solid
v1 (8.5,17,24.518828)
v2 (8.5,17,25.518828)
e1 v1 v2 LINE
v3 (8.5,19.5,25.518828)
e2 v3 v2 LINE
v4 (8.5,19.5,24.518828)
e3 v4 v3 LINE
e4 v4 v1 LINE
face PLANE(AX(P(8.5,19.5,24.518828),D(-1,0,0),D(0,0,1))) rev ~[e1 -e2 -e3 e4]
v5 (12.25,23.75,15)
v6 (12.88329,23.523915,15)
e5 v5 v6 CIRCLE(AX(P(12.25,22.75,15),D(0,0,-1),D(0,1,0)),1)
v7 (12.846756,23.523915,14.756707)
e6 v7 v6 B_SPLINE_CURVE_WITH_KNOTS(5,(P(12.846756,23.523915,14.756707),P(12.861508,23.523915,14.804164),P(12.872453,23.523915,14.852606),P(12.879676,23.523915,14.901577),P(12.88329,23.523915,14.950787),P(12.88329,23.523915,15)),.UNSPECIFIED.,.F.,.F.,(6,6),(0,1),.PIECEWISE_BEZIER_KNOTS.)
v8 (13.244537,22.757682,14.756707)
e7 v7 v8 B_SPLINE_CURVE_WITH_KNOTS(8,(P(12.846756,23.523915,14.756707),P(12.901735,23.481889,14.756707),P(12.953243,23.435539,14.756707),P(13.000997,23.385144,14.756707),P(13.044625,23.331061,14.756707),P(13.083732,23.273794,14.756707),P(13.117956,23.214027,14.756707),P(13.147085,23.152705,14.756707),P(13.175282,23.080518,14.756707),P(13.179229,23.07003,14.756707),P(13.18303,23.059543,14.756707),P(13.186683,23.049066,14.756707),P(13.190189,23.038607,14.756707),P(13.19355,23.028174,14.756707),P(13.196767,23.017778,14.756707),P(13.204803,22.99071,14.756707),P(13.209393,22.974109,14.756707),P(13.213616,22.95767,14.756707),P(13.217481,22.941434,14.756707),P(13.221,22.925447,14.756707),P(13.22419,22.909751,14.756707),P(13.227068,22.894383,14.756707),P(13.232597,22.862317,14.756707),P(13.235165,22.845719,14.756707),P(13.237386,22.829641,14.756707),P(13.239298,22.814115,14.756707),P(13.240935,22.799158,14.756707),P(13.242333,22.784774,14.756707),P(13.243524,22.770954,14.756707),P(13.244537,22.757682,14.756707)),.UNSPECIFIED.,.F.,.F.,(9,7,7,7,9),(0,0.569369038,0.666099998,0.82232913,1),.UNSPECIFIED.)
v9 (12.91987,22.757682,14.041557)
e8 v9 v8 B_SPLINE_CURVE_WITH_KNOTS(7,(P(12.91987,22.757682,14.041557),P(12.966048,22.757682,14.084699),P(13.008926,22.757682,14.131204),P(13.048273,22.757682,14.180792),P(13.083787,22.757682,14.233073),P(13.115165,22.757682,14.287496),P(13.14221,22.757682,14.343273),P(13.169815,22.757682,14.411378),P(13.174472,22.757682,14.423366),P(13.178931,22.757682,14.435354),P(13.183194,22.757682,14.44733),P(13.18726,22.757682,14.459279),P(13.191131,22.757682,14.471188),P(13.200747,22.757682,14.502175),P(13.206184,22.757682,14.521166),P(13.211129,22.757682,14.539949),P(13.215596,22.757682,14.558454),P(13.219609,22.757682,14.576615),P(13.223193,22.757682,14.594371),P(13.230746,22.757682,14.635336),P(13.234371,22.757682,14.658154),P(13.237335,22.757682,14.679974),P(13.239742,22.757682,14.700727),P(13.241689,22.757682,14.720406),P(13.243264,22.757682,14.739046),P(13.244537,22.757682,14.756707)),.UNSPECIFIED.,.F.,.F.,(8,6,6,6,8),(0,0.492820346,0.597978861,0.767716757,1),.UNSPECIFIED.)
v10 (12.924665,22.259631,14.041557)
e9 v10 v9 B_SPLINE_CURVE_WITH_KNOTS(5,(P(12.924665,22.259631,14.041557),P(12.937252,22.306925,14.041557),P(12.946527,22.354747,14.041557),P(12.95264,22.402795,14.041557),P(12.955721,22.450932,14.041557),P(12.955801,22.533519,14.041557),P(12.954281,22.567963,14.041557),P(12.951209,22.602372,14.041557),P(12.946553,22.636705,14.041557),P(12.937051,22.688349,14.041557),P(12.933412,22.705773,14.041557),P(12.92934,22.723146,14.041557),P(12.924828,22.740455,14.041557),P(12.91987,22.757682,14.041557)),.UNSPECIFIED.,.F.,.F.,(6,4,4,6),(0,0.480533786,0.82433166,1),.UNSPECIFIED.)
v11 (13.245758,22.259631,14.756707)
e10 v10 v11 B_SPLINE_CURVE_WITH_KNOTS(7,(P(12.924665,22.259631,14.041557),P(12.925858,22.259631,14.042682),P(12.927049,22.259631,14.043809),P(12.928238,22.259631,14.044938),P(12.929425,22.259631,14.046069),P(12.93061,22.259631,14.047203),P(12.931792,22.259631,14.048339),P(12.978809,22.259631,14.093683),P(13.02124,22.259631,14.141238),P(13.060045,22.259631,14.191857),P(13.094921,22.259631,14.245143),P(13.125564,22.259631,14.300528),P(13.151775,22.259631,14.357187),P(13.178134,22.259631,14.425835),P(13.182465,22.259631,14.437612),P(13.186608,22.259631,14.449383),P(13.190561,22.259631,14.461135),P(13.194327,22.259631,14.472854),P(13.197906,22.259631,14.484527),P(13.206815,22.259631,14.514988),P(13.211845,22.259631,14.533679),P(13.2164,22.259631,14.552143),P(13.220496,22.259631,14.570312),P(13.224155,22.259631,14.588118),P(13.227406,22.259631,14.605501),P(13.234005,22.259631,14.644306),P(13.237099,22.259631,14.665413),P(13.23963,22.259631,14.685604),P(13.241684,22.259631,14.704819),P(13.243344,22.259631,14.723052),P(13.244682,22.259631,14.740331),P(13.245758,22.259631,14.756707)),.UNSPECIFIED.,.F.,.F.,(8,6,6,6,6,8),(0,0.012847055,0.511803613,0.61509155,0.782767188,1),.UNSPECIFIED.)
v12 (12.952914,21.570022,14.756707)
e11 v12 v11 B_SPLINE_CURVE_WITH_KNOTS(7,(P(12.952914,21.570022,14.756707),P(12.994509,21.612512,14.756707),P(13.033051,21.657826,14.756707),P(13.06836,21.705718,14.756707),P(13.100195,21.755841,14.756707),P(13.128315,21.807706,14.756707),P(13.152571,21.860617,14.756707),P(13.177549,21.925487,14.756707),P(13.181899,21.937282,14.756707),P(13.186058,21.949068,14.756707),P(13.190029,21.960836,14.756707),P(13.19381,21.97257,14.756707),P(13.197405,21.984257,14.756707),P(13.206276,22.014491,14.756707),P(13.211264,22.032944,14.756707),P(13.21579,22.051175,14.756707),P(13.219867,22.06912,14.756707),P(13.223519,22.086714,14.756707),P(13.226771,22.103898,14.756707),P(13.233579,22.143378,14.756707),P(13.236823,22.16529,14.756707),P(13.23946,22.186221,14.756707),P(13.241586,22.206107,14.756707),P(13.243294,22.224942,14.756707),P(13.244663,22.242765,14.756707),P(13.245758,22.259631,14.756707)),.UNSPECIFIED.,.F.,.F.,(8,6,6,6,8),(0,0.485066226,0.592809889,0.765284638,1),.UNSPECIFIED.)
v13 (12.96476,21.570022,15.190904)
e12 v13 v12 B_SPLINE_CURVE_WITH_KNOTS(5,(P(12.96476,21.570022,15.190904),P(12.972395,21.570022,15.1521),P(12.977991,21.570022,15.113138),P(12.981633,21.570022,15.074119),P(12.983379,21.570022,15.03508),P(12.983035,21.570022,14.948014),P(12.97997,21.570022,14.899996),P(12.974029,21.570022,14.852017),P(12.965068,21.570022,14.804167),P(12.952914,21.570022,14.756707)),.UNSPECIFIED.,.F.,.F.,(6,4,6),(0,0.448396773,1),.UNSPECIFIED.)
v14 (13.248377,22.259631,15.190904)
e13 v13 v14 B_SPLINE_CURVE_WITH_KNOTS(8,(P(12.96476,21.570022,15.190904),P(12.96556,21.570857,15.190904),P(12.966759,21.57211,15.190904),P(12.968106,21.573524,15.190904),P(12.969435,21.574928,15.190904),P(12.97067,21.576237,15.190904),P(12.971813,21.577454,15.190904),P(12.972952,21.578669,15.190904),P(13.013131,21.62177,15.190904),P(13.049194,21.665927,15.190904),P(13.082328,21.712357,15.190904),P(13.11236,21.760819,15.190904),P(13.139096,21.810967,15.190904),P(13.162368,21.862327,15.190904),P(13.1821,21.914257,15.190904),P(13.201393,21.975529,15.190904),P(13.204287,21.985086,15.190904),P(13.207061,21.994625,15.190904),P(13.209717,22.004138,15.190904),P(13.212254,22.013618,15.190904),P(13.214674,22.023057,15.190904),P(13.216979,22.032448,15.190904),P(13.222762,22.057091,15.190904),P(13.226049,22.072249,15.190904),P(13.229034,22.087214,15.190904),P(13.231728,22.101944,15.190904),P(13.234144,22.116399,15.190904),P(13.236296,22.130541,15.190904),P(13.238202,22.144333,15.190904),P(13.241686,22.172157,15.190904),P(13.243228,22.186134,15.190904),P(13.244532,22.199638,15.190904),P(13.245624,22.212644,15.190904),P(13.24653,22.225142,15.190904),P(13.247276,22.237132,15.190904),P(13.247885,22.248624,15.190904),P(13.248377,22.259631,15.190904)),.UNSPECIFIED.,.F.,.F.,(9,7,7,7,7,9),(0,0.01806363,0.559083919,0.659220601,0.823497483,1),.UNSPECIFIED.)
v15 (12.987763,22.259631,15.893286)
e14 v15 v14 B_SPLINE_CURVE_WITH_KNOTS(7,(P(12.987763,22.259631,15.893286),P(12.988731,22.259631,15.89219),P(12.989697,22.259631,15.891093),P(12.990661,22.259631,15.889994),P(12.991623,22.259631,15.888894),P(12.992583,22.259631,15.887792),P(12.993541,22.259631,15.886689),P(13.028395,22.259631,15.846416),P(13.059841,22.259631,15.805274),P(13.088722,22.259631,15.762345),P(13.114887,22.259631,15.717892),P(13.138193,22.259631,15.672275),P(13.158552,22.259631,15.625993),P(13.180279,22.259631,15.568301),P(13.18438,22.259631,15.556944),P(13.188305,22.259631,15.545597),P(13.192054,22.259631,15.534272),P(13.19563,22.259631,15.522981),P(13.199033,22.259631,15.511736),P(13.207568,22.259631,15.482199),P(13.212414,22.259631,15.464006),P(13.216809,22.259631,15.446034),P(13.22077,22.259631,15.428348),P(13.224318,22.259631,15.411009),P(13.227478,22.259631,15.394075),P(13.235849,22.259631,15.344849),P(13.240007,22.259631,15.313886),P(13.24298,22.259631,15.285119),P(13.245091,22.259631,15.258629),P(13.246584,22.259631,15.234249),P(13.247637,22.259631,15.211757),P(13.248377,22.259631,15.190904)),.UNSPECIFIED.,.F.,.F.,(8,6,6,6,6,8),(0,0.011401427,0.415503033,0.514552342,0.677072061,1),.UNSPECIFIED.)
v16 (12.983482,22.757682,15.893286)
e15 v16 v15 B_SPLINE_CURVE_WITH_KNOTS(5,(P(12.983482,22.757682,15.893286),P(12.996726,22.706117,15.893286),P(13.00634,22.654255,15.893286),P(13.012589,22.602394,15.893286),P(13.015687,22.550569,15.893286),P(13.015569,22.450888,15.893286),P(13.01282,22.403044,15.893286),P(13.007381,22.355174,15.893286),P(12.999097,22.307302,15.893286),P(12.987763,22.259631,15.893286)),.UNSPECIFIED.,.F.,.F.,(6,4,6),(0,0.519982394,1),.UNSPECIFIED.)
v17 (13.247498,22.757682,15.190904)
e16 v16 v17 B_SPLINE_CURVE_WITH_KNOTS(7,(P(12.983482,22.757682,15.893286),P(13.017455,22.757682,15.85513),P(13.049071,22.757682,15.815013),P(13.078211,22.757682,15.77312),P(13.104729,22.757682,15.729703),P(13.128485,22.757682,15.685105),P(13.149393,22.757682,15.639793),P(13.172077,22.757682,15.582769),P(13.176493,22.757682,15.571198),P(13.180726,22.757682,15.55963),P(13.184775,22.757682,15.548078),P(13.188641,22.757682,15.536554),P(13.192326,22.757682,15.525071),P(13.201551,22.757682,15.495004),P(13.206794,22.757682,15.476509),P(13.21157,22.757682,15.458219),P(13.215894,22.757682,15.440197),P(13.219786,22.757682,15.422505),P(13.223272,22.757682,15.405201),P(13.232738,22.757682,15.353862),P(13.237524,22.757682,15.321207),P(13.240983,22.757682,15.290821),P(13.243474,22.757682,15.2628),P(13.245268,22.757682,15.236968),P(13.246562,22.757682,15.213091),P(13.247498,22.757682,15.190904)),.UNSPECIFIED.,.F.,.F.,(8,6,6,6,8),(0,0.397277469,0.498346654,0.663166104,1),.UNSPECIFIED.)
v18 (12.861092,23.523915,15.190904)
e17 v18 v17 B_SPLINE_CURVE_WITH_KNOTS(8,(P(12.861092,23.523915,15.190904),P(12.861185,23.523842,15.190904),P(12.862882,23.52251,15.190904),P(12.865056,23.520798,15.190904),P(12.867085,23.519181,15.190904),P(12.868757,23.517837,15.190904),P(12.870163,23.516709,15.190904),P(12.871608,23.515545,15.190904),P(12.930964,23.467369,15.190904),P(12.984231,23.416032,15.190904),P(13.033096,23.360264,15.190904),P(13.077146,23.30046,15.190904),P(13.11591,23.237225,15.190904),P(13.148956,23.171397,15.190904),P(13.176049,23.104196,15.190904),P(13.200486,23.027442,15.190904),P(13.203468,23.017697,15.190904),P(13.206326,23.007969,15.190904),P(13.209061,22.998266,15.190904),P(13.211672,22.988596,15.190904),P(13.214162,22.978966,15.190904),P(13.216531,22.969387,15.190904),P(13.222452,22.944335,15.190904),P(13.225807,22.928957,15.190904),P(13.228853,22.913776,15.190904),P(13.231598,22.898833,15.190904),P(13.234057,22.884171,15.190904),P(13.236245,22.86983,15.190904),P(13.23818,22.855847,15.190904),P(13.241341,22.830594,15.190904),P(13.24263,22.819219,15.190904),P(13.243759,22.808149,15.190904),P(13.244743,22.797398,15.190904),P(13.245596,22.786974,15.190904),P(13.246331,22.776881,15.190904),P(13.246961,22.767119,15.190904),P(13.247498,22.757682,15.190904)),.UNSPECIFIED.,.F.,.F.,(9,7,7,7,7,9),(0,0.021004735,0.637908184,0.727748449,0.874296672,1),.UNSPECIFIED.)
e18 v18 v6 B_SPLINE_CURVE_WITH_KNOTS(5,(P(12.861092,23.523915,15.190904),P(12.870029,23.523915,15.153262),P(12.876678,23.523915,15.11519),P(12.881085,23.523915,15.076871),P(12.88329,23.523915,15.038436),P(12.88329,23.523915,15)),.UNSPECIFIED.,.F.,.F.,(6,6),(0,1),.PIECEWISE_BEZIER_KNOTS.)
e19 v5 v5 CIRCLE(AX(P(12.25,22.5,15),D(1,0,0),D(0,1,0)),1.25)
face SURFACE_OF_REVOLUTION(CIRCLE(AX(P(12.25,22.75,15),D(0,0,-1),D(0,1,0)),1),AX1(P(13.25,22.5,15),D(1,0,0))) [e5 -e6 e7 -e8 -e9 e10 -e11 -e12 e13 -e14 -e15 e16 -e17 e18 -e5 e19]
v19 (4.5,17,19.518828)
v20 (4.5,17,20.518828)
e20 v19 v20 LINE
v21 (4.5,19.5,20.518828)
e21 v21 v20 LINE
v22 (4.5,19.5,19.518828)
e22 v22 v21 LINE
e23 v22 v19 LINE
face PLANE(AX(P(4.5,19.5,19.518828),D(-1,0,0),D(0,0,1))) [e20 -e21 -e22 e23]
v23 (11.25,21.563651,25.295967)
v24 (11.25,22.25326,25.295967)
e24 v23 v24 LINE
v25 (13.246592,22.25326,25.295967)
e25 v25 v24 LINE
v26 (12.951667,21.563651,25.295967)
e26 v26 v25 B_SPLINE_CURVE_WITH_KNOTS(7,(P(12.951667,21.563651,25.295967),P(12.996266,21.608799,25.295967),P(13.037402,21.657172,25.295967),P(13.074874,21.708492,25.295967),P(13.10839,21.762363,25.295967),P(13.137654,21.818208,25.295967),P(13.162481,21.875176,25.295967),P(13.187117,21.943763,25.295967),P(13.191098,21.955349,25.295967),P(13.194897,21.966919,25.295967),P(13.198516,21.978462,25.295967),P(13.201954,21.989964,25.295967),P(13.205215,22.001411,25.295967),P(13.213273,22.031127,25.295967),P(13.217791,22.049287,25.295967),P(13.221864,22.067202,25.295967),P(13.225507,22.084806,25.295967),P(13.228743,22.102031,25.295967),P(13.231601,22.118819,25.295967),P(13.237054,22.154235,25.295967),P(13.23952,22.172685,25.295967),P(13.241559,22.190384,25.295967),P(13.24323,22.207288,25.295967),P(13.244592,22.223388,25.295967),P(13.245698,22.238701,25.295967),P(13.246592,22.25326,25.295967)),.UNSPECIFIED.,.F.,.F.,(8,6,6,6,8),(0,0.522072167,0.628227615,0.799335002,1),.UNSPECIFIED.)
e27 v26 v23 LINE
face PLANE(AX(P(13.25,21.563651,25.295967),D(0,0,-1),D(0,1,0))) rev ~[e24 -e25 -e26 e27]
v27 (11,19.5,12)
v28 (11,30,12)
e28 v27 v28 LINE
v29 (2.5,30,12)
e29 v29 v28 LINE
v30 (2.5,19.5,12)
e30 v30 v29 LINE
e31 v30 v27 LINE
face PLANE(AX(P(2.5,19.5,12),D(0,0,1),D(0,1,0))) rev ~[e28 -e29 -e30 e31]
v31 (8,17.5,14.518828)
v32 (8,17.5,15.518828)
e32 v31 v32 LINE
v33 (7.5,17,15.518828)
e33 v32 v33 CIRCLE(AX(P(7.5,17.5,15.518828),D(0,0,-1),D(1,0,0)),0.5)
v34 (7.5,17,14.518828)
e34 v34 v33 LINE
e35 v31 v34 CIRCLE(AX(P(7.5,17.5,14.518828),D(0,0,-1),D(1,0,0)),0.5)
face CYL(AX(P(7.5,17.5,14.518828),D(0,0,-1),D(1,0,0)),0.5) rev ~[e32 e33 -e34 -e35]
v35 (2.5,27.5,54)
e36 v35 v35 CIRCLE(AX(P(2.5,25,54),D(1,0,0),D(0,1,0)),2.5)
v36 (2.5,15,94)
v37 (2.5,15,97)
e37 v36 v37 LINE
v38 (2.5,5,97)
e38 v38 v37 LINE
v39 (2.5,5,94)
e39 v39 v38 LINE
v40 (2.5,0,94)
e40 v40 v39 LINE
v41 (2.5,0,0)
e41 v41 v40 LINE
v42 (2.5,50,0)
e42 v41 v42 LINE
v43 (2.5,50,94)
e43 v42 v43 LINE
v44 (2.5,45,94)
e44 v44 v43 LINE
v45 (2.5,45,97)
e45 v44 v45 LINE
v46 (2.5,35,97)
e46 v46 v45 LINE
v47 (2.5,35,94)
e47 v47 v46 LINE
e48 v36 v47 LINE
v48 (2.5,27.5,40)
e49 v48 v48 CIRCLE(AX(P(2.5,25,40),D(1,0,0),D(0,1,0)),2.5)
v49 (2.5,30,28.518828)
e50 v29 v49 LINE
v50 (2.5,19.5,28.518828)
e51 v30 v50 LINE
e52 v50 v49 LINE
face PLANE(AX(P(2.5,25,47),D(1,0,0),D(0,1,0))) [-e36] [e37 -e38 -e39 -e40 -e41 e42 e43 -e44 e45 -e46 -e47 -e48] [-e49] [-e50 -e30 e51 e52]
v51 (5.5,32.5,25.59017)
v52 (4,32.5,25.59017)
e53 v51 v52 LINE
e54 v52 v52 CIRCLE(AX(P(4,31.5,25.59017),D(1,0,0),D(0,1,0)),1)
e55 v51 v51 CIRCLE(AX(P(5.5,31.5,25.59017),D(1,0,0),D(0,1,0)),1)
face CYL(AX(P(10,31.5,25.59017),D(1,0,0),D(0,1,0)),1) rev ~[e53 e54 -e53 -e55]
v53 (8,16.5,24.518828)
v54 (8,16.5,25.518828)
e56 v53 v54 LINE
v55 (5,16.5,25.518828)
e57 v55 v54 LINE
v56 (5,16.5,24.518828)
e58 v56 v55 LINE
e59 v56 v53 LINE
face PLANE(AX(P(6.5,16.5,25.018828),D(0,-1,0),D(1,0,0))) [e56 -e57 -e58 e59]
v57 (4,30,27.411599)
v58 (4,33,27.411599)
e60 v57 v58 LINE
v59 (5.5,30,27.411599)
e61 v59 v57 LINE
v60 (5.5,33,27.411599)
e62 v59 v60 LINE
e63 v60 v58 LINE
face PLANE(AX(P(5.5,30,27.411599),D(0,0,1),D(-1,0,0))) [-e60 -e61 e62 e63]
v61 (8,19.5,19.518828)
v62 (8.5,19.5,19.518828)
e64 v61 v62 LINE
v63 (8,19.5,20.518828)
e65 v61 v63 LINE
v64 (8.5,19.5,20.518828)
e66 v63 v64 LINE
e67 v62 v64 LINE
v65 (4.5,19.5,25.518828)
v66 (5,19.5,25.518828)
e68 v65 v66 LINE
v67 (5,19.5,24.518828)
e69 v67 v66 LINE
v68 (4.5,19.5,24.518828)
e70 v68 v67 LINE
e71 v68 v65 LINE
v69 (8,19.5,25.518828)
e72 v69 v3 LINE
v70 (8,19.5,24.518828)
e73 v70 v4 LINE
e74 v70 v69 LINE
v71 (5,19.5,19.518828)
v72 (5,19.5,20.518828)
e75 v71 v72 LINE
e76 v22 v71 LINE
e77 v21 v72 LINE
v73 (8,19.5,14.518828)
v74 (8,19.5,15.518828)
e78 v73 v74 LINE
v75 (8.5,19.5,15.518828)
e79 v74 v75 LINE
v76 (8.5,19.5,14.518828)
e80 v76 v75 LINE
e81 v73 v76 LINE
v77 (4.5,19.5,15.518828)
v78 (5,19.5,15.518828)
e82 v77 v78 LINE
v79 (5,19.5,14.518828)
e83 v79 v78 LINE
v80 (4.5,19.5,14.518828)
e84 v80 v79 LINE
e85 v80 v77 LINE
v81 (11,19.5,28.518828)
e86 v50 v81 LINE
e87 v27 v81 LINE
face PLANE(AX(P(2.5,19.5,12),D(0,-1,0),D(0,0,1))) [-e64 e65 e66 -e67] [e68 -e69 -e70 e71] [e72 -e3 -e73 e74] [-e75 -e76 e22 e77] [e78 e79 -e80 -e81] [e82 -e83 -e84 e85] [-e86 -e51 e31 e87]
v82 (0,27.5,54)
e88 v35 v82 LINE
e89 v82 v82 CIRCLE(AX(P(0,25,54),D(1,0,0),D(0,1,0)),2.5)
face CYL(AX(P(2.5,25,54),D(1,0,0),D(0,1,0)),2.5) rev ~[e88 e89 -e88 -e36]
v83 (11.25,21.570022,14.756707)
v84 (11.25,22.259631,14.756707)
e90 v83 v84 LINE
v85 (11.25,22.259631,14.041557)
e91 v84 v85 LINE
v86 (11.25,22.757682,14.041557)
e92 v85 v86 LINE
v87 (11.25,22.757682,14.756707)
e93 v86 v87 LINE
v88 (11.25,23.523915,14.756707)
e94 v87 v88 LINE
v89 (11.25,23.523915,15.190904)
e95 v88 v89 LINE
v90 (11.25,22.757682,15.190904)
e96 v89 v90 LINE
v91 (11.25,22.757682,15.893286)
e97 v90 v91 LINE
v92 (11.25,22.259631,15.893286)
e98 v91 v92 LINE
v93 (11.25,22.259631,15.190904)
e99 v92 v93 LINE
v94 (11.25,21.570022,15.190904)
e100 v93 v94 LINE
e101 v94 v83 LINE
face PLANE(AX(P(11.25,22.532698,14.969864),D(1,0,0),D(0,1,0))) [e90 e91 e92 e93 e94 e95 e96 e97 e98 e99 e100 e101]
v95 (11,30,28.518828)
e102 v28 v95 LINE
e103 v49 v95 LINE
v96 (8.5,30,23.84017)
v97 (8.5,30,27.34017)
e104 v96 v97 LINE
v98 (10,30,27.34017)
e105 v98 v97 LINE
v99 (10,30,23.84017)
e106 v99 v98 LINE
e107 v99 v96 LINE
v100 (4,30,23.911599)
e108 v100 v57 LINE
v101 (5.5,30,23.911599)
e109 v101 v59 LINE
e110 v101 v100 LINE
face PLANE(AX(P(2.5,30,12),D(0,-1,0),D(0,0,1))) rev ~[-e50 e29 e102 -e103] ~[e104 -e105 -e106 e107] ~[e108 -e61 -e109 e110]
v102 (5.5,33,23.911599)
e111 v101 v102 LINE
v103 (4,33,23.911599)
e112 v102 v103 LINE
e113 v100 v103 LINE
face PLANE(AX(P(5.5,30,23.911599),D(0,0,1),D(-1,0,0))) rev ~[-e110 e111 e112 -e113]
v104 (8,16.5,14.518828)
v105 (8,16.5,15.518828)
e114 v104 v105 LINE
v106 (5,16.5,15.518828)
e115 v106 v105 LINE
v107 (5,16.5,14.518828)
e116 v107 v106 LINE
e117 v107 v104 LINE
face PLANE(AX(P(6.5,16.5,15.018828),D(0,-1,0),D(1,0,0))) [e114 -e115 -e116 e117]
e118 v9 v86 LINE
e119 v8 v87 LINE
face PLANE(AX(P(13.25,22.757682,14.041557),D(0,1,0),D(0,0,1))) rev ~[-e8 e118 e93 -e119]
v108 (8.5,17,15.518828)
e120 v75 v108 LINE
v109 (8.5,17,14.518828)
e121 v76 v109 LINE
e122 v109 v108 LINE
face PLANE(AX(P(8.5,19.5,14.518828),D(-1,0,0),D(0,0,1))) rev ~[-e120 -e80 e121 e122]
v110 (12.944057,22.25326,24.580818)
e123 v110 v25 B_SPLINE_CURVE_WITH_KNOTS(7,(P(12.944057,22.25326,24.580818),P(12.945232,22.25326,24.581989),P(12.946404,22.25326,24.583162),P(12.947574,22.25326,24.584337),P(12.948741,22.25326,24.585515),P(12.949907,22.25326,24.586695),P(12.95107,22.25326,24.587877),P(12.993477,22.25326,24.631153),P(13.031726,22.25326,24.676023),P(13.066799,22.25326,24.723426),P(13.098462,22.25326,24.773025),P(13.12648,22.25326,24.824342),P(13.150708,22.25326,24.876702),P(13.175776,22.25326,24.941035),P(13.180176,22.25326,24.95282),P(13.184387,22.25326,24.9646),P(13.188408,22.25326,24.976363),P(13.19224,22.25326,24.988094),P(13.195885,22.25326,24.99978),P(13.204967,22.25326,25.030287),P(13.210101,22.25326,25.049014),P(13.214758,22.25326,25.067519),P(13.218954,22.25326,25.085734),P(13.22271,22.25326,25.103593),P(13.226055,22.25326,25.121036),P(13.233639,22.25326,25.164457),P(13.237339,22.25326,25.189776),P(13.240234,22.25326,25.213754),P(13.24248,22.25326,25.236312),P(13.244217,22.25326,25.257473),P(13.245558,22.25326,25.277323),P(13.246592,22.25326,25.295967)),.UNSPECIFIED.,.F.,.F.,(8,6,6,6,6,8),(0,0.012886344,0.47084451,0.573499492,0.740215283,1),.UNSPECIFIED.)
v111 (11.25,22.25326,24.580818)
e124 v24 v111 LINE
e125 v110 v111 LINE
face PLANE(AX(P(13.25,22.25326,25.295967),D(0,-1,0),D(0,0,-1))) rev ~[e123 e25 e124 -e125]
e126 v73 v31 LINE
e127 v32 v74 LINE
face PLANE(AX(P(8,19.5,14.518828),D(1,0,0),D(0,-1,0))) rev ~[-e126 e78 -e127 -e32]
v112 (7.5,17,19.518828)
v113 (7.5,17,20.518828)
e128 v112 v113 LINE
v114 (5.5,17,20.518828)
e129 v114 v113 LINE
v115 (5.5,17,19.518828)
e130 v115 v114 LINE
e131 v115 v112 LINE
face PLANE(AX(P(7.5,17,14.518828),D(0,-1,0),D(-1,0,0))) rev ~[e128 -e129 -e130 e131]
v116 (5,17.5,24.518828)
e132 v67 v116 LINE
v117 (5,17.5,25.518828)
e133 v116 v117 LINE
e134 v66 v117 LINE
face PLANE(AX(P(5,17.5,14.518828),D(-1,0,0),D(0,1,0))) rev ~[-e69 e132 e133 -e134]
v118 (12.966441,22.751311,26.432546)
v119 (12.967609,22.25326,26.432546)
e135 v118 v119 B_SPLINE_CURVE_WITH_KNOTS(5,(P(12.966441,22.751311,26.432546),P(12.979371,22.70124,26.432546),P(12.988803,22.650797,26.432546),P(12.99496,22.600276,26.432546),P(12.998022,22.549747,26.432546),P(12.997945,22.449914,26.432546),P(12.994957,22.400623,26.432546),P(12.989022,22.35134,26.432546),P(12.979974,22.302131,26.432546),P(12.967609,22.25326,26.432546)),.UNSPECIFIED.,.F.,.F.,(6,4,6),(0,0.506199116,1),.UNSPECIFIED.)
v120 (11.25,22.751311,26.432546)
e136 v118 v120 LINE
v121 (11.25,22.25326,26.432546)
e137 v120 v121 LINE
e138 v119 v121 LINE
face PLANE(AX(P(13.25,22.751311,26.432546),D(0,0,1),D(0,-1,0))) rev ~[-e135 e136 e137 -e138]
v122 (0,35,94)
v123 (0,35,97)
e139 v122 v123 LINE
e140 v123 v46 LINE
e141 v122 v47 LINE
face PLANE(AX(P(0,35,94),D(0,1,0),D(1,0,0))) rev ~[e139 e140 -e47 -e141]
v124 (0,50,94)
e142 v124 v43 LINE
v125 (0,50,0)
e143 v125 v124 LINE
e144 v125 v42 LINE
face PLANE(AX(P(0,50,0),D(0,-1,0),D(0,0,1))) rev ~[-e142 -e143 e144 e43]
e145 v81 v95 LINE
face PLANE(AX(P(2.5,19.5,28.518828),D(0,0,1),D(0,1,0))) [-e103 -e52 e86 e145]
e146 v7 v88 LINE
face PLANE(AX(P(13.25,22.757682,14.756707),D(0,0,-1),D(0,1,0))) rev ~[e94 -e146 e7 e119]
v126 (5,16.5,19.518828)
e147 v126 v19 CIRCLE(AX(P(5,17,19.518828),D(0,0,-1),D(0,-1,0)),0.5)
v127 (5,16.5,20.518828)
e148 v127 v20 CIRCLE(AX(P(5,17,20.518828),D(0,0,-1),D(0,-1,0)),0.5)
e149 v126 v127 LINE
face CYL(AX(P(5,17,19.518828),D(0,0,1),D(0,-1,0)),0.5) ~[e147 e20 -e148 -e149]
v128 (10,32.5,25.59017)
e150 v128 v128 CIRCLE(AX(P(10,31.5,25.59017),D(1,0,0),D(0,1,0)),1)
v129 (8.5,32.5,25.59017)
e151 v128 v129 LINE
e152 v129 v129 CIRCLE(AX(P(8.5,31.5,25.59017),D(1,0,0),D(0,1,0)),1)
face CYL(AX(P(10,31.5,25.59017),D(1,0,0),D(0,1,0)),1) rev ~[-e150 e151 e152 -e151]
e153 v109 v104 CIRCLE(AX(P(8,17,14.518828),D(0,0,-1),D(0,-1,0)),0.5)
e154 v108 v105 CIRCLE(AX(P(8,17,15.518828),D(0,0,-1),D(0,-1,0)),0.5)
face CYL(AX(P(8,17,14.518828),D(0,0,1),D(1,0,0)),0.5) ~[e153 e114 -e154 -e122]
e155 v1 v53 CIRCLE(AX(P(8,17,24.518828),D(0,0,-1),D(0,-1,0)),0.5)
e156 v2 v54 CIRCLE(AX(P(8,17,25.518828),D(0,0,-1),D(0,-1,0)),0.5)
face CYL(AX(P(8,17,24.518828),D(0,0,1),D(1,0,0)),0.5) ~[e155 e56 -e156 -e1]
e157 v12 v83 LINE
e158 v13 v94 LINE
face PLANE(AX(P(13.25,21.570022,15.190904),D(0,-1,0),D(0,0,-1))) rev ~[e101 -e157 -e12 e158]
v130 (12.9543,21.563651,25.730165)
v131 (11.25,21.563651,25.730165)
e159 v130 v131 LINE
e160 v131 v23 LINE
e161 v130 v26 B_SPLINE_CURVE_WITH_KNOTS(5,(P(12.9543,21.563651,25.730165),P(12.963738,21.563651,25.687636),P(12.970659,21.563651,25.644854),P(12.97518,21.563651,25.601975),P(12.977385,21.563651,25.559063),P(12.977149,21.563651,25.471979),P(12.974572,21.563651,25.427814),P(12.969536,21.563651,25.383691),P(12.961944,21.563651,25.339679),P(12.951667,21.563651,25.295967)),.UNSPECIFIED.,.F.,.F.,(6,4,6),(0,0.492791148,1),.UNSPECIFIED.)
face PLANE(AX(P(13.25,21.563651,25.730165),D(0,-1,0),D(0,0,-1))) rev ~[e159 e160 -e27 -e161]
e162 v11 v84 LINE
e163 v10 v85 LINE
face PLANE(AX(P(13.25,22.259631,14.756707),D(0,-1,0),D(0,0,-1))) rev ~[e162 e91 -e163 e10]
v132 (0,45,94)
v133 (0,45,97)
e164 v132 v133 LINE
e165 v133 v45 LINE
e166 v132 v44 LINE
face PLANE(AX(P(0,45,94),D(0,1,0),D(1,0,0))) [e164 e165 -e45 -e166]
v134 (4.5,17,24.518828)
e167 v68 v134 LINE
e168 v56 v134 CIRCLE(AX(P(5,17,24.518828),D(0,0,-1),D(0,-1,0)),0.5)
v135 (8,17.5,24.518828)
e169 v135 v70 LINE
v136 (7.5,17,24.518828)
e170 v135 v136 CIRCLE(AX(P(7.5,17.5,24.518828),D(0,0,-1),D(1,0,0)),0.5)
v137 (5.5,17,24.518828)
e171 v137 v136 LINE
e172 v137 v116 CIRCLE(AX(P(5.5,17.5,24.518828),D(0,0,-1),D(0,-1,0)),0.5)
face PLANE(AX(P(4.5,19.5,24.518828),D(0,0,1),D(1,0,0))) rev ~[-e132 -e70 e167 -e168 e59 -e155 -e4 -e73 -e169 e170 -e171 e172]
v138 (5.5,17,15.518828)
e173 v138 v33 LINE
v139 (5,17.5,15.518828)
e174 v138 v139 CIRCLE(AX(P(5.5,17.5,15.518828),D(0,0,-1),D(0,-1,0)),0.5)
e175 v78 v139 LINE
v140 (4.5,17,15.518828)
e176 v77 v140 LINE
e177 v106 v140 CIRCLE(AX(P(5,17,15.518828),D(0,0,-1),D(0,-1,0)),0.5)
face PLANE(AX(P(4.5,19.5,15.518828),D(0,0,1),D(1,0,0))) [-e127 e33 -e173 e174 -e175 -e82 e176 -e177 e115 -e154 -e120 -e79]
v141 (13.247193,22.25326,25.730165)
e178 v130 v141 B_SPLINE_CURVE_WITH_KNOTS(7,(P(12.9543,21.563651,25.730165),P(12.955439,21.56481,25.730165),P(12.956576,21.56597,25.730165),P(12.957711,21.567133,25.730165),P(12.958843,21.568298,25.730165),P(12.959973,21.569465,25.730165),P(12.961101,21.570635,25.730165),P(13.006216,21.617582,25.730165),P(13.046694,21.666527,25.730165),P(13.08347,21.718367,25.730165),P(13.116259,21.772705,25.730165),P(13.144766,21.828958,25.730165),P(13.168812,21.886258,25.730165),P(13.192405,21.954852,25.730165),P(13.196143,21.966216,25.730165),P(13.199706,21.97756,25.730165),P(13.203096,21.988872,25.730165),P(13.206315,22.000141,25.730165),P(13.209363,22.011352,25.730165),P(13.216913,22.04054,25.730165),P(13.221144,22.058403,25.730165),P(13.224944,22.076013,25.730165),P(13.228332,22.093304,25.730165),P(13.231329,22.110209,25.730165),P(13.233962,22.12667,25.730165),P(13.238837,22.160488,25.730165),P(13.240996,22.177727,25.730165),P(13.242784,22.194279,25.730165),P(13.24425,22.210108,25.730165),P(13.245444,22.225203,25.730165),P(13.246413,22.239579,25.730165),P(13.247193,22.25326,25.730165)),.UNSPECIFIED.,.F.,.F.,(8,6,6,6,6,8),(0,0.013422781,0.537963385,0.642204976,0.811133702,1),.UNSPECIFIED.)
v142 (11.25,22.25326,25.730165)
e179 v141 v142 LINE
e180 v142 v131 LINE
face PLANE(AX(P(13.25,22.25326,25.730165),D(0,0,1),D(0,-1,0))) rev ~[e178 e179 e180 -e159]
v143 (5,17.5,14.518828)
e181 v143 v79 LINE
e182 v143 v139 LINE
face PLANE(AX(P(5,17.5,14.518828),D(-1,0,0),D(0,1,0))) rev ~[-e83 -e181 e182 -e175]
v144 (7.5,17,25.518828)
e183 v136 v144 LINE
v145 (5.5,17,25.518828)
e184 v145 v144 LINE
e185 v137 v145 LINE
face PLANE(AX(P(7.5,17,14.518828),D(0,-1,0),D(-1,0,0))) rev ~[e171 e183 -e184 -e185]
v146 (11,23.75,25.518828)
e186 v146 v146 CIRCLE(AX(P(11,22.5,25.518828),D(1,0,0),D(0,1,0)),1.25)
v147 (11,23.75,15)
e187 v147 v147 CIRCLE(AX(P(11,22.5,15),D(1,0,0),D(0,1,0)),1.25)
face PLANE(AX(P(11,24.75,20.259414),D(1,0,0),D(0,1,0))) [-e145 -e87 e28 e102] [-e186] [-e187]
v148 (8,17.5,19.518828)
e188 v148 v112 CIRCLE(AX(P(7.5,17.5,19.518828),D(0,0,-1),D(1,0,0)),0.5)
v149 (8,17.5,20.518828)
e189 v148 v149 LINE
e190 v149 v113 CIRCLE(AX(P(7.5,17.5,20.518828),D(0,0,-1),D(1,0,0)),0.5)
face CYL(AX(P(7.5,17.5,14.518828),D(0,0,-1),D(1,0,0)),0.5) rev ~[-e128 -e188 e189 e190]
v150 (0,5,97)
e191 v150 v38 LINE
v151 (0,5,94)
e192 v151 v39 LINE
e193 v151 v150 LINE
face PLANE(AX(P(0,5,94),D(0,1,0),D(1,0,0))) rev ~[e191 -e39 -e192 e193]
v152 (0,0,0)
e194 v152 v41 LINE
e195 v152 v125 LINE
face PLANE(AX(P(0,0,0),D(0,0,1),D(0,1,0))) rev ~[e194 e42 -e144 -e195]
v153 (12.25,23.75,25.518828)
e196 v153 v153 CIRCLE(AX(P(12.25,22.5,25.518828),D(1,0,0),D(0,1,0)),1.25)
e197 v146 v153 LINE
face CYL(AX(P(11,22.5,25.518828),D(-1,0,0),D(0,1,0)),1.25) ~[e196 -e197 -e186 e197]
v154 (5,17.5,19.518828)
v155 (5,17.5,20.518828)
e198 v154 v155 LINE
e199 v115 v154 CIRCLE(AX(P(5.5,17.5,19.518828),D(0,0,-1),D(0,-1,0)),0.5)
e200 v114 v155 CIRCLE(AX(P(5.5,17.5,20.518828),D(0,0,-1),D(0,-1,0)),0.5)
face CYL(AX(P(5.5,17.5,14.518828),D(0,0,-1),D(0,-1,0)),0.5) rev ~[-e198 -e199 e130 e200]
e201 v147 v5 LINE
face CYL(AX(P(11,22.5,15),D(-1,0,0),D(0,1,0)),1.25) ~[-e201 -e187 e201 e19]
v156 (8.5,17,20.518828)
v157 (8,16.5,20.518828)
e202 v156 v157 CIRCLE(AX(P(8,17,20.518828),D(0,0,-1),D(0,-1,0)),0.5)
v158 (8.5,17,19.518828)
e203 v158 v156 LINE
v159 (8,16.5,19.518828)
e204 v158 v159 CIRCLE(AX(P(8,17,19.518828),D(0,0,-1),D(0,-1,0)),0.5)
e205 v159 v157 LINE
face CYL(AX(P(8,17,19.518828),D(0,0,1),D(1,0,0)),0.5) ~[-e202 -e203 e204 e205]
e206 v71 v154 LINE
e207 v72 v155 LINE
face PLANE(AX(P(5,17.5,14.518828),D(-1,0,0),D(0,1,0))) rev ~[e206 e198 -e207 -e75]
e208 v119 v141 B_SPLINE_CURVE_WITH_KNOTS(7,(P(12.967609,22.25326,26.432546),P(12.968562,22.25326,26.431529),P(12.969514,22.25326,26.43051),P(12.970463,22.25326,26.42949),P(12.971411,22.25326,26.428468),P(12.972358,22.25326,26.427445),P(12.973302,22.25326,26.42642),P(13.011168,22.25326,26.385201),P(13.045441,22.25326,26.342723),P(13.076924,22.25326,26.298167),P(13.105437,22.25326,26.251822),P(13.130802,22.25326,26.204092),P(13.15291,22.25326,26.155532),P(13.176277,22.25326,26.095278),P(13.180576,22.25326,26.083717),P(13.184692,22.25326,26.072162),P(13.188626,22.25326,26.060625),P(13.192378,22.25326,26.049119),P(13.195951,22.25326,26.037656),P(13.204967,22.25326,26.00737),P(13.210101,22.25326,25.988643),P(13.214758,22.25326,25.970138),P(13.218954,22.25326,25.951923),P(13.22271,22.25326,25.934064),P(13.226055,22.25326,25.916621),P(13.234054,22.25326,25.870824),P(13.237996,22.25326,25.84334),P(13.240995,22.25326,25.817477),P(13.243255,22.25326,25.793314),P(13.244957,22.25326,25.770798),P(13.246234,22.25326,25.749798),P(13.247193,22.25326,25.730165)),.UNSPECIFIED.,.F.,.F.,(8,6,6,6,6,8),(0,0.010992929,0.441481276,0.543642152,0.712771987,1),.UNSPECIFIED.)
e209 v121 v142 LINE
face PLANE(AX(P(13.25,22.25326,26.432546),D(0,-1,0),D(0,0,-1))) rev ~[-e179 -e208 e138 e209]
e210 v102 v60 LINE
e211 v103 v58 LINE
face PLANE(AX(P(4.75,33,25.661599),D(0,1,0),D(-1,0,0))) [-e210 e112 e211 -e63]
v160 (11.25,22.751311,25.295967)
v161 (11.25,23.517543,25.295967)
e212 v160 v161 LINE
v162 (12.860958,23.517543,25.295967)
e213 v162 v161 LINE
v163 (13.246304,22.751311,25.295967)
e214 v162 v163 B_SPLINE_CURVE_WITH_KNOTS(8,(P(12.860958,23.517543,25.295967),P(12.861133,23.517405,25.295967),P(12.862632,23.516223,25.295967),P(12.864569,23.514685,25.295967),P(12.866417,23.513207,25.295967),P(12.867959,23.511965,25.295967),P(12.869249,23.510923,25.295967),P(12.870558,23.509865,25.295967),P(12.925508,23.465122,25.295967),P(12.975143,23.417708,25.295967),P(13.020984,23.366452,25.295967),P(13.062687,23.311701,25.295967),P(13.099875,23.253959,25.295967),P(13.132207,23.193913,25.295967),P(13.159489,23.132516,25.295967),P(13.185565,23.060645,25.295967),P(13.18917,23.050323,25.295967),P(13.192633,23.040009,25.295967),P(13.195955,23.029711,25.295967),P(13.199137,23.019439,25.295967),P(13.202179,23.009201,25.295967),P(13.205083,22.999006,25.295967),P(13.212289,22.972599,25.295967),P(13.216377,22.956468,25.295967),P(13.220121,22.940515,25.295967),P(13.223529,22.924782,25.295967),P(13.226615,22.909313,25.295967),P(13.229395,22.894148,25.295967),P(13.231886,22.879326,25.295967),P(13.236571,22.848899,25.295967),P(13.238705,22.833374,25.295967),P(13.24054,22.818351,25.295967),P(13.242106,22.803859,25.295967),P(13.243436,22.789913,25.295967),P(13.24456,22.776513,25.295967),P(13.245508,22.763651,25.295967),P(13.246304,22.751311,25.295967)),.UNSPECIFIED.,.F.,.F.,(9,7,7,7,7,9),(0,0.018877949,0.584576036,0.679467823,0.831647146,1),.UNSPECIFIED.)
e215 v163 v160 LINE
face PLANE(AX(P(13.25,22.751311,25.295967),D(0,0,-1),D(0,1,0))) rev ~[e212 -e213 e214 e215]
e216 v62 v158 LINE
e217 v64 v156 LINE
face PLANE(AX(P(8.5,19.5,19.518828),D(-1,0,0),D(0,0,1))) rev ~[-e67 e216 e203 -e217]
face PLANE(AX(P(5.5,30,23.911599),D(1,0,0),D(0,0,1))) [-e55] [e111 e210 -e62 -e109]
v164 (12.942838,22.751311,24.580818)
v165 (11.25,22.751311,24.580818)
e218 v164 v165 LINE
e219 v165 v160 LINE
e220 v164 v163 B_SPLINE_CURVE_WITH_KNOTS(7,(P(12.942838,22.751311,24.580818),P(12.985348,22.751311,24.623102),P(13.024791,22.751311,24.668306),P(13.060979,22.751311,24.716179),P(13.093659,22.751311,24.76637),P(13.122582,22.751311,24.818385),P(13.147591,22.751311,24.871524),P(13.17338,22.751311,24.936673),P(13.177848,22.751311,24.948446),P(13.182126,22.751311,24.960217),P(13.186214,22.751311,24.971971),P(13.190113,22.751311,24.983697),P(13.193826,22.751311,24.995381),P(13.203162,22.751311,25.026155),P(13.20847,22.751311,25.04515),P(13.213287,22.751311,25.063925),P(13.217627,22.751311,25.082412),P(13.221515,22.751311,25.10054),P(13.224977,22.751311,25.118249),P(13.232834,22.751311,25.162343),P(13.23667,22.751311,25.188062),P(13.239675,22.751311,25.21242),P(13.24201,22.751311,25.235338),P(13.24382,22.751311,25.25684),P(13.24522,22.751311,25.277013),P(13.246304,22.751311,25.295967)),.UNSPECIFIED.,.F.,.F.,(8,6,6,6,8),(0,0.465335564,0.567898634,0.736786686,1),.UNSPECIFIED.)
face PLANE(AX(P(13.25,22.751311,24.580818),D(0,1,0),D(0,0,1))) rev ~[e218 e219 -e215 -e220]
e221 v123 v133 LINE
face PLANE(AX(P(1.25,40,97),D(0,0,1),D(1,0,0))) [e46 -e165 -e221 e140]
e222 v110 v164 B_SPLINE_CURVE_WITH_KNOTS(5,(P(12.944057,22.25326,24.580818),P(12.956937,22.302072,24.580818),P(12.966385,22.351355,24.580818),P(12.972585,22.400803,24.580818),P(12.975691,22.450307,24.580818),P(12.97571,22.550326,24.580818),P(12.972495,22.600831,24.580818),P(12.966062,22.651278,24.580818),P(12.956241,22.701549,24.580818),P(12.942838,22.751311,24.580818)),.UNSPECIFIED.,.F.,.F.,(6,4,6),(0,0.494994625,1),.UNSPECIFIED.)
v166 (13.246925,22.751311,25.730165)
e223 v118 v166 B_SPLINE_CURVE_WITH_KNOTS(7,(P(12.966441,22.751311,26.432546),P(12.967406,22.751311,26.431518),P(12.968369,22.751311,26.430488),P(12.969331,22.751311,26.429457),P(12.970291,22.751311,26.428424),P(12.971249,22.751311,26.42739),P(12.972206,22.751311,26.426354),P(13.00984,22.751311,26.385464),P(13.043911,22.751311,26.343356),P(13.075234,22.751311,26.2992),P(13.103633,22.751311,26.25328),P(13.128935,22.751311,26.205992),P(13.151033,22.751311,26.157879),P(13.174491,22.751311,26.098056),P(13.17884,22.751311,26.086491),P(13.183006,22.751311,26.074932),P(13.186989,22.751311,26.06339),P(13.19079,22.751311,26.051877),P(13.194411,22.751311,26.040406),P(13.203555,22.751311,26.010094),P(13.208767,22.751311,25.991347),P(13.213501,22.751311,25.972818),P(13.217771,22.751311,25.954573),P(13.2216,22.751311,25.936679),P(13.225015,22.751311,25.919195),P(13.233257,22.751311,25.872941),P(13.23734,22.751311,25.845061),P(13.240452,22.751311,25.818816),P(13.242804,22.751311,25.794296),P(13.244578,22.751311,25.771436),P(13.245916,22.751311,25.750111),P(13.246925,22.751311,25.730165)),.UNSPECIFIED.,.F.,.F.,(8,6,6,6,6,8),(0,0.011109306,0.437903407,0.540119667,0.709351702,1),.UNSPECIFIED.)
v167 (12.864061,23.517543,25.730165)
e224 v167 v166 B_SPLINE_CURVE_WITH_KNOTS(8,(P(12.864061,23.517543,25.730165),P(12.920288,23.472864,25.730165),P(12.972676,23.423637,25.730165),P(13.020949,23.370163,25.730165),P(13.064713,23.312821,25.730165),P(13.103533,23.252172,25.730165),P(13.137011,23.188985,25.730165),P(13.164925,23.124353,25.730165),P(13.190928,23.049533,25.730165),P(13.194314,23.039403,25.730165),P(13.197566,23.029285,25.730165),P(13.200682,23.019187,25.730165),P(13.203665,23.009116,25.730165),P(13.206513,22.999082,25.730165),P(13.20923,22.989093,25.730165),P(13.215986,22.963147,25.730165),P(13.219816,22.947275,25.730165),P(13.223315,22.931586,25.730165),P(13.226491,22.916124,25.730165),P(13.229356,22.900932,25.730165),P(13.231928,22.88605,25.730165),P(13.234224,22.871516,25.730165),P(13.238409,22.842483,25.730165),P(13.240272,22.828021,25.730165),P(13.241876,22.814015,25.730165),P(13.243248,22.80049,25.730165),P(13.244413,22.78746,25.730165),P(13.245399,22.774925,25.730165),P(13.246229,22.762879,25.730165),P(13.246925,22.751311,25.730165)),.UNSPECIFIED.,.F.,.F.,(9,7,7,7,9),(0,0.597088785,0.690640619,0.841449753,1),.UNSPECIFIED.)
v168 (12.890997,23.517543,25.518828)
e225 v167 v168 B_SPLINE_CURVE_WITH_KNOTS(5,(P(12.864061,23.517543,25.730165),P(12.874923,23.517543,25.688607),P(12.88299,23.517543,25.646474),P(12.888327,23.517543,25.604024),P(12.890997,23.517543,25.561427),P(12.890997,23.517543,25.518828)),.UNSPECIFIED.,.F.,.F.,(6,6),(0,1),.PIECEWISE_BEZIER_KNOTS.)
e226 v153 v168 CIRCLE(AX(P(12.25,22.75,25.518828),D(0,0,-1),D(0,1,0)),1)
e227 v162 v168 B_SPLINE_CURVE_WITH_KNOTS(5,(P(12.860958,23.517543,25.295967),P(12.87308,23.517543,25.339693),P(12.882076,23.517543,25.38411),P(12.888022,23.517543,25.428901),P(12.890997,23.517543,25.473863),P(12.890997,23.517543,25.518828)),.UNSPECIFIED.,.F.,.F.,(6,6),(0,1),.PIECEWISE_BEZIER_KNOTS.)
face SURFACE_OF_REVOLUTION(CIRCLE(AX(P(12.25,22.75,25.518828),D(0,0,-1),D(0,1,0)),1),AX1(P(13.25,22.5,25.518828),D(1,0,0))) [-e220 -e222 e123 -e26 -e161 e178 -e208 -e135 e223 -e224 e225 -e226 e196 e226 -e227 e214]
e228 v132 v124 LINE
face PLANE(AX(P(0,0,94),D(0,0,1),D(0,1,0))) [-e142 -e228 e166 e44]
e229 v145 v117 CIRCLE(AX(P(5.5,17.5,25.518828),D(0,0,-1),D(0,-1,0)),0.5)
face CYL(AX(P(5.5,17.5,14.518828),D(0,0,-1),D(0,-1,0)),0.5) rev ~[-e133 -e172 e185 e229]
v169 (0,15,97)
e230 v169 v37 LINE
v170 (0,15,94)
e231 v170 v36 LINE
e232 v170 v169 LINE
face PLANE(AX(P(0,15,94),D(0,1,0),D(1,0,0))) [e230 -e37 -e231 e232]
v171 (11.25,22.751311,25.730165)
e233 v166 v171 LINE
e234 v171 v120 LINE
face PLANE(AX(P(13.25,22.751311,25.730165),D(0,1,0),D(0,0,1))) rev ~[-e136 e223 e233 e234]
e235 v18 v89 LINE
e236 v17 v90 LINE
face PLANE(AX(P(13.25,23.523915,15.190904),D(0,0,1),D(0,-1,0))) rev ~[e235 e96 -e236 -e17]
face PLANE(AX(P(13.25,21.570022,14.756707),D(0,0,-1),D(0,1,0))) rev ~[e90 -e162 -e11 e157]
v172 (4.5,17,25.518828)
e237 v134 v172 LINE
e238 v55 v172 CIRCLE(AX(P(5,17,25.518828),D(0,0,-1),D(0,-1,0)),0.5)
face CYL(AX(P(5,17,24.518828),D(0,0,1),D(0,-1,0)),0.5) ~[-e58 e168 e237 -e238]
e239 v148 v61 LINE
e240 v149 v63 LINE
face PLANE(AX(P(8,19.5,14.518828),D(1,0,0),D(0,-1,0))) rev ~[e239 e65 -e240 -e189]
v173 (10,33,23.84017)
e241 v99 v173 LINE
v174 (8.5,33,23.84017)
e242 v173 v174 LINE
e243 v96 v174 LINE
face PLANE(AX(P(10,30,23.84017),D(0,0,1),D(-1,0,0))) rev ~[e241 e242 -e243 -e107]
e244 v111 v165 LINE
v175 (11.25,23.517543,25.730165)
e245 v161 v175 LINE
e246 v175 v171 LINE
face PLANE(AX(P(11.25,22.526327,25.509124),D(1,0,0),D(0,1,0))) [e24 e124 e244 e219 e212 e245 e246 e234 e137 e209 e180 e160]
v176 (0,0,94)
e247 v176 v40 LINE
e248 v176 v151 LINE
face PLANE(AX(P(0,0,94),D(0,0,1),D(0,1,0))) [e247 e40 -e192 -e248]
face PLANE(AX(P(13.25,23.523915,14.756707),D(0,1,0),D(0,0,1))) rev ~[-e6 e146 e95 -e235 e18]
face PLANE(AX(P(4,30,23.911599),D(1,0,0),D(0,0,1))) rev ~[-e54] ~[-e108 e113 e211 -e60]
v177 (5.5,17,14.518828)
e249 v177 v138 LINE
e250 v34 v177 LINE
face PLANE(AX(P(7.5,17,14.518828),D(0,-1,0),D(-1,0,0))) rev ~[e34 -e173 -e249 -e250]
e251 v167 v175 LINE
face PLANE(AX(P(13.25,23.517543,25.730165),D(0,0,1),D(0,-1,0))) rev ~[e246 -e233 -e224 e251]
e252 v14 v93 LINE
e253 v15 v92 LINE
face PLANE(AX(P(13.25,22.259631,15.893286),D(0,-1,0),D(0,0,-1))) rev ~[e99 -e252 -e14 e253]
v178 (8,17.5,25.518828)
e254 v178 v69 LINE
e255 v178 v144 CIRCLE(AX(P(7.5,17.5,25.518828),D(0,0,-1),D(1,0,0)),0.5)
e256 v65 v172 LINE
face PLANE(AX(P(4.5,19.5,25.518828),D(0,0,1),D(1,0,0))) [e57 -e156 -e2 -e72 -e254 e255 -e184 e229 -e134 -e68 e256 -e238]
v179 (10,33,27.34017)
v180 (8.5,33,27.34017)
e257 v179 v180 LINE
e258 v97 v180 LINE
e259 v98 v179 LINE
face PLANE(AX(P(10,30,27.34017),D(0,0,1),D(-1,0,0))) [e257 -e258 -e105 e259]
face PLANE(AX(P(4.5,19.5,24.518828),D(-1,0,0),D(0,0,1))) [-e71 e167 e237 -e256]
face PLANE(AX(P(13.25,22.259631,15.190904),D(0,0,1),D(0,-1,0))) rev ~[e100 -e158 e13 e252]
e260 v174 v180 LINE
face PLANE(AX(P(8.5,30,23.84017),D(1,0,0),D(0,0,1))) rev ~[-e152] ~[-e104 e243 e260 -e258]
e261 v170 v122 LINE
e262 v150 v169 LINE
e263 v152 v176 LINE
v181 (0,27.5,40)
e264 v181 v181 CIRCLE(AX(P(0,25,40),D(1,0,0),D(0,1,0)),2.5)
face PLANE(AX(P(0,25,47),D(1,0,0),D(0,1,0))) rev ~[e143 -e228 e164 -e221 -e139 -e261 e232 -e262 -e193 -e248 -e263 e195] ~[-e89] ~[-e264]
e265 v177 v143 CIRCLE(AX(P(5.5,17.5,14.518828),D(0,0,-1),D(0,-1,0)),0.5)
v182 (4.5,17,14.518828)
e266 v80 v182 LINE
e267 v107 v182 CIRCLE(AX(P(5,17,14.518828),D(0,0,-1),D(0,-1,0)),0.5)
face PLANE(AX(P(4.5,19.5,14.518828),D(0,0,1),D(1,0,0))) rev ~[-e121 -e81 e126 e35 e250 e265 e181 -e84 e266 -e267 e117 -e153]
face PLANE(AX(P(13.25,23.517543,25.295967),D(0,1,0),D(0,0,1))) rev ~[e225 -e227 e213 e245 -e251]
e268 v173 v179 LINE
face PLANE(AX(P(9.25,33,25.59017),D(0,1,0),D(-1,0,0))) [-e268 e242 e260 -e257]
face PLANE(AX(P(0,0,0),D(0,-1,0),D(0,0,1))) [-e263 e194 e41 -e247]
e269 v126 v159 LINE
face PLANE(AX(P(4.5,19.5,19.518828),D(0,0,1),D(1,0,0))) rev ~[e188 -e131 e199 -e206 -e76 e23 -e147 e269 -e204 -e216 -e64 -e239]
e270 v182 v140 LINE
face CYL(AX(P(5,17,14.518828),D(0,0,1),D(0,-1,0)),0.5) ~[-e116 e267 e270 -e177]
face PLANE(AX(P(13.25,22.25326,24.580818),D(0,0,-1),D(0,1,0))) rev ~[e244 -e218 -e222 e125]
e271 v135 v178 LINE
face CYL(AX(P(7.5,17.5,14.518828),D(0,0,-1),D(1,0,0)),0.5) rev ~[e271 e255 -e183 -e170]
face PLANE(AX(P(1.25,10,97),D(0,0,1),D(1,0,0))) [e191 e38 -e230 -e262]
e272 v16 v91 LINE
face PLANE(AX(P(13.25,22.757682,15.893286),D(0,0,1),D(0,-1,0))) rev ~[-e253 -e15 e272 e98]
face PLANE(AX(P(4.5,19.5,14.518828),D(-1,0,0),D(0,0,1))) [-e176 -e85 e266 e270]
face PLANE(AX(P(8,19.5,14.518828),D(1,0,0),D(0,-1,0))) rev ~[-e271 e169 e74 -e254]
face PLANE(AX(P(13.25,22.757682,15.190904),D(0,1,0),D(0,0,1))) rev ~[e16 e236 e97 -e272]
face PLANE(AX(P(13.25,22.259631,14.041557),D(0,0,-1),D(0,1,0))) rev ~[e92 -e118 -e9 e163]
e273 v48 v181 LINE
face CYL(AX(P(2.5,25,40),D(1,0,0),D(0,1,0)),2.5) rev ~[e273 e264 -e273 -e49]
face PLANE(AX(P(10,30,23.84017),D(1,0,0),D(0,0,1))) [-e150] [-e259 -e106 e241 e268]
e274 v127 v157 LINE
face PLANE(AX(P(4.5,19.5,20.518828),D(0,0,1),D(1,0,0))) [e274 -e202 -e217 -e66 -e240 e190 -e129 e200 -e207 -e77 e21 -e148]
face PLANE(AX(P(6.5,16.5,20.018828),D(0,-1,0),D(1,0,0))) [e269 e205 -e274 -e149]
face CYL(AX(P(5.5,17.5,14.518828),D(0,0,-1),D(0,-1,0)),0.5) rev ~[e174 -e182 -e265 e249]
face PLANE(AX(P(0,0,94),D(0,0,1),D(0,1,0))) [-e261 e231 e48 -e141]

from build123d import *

# Parameters (mm, degrees)
F0_W      = 50
F0_H      = 94
F1_DEPTH  = 2.5
F2_W      = 2.5
F2_H      = 10
F3_DEPTH  = 3
F4_R      = 2.5
F5_DEPTH  = 25
F6_W      = 10.5
F6_H      = 16.5188284865
F7_DEPTH  = 8.5
F8_W      = 4
F8_H      = 1
F9_DEPTH  = 3
F11_DEPTH = 82.4821715135
F12_R     = 0.5
F13_R     = 1.25
F14_DEPTH = 2.25
F16_DEPTH = 2
F18_W     = 1.5
F18_H     = 3.5
F19_DEPTH = 3
F20_R     = 1
F21_DEPTH = 6


# Not quite as in the source:
# - a fillet or chamfer that OpenCascade refuses, or shapes differently, is made with other operations: its cross-section is extruded or revolved along the edge and cut away or added


with BuildPart() as f1:
    # F0 (on Right) → F1 (new body)
    with BuildSketch(Plane.YZ):
        with Locations((25, 47)):
            Rectangle(F0_W, F0_H)
    extrude(amount=F1_DEPTH)

    # F2 (on face) → F3 (join)
    with BuildSketch(Plane.XY.offset(94)):
        with Locations((1.25, 40)):
            Rectangle(F2_W, F2_H)
        with Locations((1.25, 10)):
            Rectangle(F2_W, F2_H)
    extrude(amount=F3_DEPTH)

    # F4 (on face) → F5 (cut)
    with BuildSketch(Plane.YZ.offset(2.5)):
        with Locations((25, 40)):
            Circle(F4_R)
        with Locations((25, 54)):
            Circle(F4_R)
    extrude(amount=-F5_DEPTH, mode=Mode.SUBTRACT)

    # F6 (on face) → F7 (join)
    with BuildSketch(Plane.YZ.offset(2.5)):
        with Locations((24.75, 20.2594142432)):
            Rectangle(F6_W, F6_H)
    extrude(amount=F7_DEPTH)

    # F8 (on face) → F9 (join)
    with BuildSketch(Plane.XZ.offset(-19.5)):
        with Locations((6.5, 25.0188284865)):
            Rectangle(F8_W, F8_H)
        with Locations((6.5, 20.0188284865)):
            Rectangle(F8_W, F8_H)
        with Locations((6.5, 15.0188284865)):
            Rectangle(F8_W, F8_H)
    extrude(amount=F9_DEPTH)

    # F10 (on face) → F11 (cut, through all)
    with BuildSketch(Plane(origin=(0, 0, 14.5188284865), x_dir=(1, 0, 0), z_dir=(0, 0, -1))):
        with BuildLine():
            Line((5, -17.5), (5, -19.5))
            Line((5, -19.5), (8, -19.5))
            Line((8, -19.5), (8, -17.5))
            ThreePointArc((8, -17.5), (7.8535533906, -17.1464466094), (7.5, -17))
            Line((7.5, -17), (5.5, -17))
            ThreePointArc((5.5, -17), (5.1464466094, -17.1464466094), (5, -17.5))
        make_face()
    extrude(amount=-F11_DEPTH, mode=Mode.SUBTRACT)

    # F12
    f12_edges = [f1.edges().sort_by_distance(p)[0] for p in [
        (8.5, 16.5, 15.018828),
        (8.5, 16.5, 20.018828),
        (8.5, 16.5, 25.018828),
        (4.5, 16.5, 25.018828),
        (4.5, 16.5, 20.018828),
        (4.5, 16.5, 15.018828),
    ]]
    fillet(f12_edges, radius=F12_R)

    # F13 (on face) → F14 (join)
    with BuildSketch(Plane.YZ.offset(11)):
        with Locations((22.5, 25.5188284865)):
            Circle(F13_R)
        with Locations((22.5, 15)):
            Circle(F13_R)
    extrude(amount=F14_DEPTH)

    # F15 (on face) → F16 (cut)
    with BuildSketch(Plane.YZ.offset(13.25)):
        Polygon((22.2532600164, 25.2959672362), (22.2532600164, 24.5808176696), (22.7513108402, 24.5808176696), (22.7513108402, 25.2959672362), (23.51754345, 25.2959672362), (23.51754345, 25.7301647216), (22.7513108402, 25.7301647216), (22.7513108402, 26.4325458556), (22.2532600164, 26.4325458556), (22.2532600164, 25.7301647216), (21.5636510402, 25.7301647216), (21.5636510402, 25.2959672362), align=None)
        Polygon((22.2596314482, 14.7567068819), (22.2596314482, 14.0415573154), (22.757682272, 14.0415573154), (22.757682272, 14.7567068819), (23.5239148817, 14.7567068819), (23.5239148817, 15.1909043674), (22.757682272, 15.1909043674), (22.757682272, 15.8932855014), (22.2596314482, 15.8932855014), (22.2596314482, 15.1909043674), (21.5700224719, 15.1909043674), (21.5700224719, 14.7567068819), align=None)
    extrude(amount=-F16_DEPTH, mode=Mode.SUBTRACT)

    # F17: fillet of radius 1 on 2 edges, made by hand

    # F17_s1 → F17_t2 (revolve, cut)
    with BuildSketch(Plane.XY.offset(25.5188284865)):
        with BuildLine():
            ThreePointArc((12.25, 23.75), (12.9571067812, 23.4571067812), (13.25, 22.75))
            Line((13.25, 22.75), (13.25, 23.75))
            Line((13.25, 23.75), (12.25, 23.75))
        make_face()
    revolve(axis=Axis((13.25, 22.5, 25.5188284865), (1, 0, 0)), mode=Mode.SUBTRACT)

    # F17_s3 → F17_t4 (revolve, cut)
    with BuildSketch(Plane.XY.offset(15)):
        with BuildLine():
            ThreePointArc((12.25, 23.75), (12.9571067812, 23.4571067812), (13.25, 22.75))
            Line((13.25, 22.75), (13.25, 23.75))
            Line((13.25, 23.75), (12.25, 23.75))
        make_face()
    revolve(axis=Axis((13.25, 22.5, 15), (1, 0, 0)), mode=Mode.SUBTRACT)

    # F18 (on face) → F19 (join)
    with BuildSketch(Plane(origin=(0, 30, 0), x_dir=(-1, 0, 0), z_dir=(0, 1, 0))):
        with Locations((-9.25, 25.5901701748)):
            Rectangle(F18_W, F18_H)
        with Locations((-4.75, 25.6615988507)):
            Rectangle(F18_W, F18_H)
    extrude(amount=F19_DEPTH)

    # F20 (on face) → F21 (cut)
    with BuildSketch(Plane.YZ.offset(10)):
        with Locations((31.5, 25.5901701748)):
            Circle(F20_R)
    extrude(amount=-F21_DEPTH, mode=Mode.SUBTRACT)


solid = f1.part
